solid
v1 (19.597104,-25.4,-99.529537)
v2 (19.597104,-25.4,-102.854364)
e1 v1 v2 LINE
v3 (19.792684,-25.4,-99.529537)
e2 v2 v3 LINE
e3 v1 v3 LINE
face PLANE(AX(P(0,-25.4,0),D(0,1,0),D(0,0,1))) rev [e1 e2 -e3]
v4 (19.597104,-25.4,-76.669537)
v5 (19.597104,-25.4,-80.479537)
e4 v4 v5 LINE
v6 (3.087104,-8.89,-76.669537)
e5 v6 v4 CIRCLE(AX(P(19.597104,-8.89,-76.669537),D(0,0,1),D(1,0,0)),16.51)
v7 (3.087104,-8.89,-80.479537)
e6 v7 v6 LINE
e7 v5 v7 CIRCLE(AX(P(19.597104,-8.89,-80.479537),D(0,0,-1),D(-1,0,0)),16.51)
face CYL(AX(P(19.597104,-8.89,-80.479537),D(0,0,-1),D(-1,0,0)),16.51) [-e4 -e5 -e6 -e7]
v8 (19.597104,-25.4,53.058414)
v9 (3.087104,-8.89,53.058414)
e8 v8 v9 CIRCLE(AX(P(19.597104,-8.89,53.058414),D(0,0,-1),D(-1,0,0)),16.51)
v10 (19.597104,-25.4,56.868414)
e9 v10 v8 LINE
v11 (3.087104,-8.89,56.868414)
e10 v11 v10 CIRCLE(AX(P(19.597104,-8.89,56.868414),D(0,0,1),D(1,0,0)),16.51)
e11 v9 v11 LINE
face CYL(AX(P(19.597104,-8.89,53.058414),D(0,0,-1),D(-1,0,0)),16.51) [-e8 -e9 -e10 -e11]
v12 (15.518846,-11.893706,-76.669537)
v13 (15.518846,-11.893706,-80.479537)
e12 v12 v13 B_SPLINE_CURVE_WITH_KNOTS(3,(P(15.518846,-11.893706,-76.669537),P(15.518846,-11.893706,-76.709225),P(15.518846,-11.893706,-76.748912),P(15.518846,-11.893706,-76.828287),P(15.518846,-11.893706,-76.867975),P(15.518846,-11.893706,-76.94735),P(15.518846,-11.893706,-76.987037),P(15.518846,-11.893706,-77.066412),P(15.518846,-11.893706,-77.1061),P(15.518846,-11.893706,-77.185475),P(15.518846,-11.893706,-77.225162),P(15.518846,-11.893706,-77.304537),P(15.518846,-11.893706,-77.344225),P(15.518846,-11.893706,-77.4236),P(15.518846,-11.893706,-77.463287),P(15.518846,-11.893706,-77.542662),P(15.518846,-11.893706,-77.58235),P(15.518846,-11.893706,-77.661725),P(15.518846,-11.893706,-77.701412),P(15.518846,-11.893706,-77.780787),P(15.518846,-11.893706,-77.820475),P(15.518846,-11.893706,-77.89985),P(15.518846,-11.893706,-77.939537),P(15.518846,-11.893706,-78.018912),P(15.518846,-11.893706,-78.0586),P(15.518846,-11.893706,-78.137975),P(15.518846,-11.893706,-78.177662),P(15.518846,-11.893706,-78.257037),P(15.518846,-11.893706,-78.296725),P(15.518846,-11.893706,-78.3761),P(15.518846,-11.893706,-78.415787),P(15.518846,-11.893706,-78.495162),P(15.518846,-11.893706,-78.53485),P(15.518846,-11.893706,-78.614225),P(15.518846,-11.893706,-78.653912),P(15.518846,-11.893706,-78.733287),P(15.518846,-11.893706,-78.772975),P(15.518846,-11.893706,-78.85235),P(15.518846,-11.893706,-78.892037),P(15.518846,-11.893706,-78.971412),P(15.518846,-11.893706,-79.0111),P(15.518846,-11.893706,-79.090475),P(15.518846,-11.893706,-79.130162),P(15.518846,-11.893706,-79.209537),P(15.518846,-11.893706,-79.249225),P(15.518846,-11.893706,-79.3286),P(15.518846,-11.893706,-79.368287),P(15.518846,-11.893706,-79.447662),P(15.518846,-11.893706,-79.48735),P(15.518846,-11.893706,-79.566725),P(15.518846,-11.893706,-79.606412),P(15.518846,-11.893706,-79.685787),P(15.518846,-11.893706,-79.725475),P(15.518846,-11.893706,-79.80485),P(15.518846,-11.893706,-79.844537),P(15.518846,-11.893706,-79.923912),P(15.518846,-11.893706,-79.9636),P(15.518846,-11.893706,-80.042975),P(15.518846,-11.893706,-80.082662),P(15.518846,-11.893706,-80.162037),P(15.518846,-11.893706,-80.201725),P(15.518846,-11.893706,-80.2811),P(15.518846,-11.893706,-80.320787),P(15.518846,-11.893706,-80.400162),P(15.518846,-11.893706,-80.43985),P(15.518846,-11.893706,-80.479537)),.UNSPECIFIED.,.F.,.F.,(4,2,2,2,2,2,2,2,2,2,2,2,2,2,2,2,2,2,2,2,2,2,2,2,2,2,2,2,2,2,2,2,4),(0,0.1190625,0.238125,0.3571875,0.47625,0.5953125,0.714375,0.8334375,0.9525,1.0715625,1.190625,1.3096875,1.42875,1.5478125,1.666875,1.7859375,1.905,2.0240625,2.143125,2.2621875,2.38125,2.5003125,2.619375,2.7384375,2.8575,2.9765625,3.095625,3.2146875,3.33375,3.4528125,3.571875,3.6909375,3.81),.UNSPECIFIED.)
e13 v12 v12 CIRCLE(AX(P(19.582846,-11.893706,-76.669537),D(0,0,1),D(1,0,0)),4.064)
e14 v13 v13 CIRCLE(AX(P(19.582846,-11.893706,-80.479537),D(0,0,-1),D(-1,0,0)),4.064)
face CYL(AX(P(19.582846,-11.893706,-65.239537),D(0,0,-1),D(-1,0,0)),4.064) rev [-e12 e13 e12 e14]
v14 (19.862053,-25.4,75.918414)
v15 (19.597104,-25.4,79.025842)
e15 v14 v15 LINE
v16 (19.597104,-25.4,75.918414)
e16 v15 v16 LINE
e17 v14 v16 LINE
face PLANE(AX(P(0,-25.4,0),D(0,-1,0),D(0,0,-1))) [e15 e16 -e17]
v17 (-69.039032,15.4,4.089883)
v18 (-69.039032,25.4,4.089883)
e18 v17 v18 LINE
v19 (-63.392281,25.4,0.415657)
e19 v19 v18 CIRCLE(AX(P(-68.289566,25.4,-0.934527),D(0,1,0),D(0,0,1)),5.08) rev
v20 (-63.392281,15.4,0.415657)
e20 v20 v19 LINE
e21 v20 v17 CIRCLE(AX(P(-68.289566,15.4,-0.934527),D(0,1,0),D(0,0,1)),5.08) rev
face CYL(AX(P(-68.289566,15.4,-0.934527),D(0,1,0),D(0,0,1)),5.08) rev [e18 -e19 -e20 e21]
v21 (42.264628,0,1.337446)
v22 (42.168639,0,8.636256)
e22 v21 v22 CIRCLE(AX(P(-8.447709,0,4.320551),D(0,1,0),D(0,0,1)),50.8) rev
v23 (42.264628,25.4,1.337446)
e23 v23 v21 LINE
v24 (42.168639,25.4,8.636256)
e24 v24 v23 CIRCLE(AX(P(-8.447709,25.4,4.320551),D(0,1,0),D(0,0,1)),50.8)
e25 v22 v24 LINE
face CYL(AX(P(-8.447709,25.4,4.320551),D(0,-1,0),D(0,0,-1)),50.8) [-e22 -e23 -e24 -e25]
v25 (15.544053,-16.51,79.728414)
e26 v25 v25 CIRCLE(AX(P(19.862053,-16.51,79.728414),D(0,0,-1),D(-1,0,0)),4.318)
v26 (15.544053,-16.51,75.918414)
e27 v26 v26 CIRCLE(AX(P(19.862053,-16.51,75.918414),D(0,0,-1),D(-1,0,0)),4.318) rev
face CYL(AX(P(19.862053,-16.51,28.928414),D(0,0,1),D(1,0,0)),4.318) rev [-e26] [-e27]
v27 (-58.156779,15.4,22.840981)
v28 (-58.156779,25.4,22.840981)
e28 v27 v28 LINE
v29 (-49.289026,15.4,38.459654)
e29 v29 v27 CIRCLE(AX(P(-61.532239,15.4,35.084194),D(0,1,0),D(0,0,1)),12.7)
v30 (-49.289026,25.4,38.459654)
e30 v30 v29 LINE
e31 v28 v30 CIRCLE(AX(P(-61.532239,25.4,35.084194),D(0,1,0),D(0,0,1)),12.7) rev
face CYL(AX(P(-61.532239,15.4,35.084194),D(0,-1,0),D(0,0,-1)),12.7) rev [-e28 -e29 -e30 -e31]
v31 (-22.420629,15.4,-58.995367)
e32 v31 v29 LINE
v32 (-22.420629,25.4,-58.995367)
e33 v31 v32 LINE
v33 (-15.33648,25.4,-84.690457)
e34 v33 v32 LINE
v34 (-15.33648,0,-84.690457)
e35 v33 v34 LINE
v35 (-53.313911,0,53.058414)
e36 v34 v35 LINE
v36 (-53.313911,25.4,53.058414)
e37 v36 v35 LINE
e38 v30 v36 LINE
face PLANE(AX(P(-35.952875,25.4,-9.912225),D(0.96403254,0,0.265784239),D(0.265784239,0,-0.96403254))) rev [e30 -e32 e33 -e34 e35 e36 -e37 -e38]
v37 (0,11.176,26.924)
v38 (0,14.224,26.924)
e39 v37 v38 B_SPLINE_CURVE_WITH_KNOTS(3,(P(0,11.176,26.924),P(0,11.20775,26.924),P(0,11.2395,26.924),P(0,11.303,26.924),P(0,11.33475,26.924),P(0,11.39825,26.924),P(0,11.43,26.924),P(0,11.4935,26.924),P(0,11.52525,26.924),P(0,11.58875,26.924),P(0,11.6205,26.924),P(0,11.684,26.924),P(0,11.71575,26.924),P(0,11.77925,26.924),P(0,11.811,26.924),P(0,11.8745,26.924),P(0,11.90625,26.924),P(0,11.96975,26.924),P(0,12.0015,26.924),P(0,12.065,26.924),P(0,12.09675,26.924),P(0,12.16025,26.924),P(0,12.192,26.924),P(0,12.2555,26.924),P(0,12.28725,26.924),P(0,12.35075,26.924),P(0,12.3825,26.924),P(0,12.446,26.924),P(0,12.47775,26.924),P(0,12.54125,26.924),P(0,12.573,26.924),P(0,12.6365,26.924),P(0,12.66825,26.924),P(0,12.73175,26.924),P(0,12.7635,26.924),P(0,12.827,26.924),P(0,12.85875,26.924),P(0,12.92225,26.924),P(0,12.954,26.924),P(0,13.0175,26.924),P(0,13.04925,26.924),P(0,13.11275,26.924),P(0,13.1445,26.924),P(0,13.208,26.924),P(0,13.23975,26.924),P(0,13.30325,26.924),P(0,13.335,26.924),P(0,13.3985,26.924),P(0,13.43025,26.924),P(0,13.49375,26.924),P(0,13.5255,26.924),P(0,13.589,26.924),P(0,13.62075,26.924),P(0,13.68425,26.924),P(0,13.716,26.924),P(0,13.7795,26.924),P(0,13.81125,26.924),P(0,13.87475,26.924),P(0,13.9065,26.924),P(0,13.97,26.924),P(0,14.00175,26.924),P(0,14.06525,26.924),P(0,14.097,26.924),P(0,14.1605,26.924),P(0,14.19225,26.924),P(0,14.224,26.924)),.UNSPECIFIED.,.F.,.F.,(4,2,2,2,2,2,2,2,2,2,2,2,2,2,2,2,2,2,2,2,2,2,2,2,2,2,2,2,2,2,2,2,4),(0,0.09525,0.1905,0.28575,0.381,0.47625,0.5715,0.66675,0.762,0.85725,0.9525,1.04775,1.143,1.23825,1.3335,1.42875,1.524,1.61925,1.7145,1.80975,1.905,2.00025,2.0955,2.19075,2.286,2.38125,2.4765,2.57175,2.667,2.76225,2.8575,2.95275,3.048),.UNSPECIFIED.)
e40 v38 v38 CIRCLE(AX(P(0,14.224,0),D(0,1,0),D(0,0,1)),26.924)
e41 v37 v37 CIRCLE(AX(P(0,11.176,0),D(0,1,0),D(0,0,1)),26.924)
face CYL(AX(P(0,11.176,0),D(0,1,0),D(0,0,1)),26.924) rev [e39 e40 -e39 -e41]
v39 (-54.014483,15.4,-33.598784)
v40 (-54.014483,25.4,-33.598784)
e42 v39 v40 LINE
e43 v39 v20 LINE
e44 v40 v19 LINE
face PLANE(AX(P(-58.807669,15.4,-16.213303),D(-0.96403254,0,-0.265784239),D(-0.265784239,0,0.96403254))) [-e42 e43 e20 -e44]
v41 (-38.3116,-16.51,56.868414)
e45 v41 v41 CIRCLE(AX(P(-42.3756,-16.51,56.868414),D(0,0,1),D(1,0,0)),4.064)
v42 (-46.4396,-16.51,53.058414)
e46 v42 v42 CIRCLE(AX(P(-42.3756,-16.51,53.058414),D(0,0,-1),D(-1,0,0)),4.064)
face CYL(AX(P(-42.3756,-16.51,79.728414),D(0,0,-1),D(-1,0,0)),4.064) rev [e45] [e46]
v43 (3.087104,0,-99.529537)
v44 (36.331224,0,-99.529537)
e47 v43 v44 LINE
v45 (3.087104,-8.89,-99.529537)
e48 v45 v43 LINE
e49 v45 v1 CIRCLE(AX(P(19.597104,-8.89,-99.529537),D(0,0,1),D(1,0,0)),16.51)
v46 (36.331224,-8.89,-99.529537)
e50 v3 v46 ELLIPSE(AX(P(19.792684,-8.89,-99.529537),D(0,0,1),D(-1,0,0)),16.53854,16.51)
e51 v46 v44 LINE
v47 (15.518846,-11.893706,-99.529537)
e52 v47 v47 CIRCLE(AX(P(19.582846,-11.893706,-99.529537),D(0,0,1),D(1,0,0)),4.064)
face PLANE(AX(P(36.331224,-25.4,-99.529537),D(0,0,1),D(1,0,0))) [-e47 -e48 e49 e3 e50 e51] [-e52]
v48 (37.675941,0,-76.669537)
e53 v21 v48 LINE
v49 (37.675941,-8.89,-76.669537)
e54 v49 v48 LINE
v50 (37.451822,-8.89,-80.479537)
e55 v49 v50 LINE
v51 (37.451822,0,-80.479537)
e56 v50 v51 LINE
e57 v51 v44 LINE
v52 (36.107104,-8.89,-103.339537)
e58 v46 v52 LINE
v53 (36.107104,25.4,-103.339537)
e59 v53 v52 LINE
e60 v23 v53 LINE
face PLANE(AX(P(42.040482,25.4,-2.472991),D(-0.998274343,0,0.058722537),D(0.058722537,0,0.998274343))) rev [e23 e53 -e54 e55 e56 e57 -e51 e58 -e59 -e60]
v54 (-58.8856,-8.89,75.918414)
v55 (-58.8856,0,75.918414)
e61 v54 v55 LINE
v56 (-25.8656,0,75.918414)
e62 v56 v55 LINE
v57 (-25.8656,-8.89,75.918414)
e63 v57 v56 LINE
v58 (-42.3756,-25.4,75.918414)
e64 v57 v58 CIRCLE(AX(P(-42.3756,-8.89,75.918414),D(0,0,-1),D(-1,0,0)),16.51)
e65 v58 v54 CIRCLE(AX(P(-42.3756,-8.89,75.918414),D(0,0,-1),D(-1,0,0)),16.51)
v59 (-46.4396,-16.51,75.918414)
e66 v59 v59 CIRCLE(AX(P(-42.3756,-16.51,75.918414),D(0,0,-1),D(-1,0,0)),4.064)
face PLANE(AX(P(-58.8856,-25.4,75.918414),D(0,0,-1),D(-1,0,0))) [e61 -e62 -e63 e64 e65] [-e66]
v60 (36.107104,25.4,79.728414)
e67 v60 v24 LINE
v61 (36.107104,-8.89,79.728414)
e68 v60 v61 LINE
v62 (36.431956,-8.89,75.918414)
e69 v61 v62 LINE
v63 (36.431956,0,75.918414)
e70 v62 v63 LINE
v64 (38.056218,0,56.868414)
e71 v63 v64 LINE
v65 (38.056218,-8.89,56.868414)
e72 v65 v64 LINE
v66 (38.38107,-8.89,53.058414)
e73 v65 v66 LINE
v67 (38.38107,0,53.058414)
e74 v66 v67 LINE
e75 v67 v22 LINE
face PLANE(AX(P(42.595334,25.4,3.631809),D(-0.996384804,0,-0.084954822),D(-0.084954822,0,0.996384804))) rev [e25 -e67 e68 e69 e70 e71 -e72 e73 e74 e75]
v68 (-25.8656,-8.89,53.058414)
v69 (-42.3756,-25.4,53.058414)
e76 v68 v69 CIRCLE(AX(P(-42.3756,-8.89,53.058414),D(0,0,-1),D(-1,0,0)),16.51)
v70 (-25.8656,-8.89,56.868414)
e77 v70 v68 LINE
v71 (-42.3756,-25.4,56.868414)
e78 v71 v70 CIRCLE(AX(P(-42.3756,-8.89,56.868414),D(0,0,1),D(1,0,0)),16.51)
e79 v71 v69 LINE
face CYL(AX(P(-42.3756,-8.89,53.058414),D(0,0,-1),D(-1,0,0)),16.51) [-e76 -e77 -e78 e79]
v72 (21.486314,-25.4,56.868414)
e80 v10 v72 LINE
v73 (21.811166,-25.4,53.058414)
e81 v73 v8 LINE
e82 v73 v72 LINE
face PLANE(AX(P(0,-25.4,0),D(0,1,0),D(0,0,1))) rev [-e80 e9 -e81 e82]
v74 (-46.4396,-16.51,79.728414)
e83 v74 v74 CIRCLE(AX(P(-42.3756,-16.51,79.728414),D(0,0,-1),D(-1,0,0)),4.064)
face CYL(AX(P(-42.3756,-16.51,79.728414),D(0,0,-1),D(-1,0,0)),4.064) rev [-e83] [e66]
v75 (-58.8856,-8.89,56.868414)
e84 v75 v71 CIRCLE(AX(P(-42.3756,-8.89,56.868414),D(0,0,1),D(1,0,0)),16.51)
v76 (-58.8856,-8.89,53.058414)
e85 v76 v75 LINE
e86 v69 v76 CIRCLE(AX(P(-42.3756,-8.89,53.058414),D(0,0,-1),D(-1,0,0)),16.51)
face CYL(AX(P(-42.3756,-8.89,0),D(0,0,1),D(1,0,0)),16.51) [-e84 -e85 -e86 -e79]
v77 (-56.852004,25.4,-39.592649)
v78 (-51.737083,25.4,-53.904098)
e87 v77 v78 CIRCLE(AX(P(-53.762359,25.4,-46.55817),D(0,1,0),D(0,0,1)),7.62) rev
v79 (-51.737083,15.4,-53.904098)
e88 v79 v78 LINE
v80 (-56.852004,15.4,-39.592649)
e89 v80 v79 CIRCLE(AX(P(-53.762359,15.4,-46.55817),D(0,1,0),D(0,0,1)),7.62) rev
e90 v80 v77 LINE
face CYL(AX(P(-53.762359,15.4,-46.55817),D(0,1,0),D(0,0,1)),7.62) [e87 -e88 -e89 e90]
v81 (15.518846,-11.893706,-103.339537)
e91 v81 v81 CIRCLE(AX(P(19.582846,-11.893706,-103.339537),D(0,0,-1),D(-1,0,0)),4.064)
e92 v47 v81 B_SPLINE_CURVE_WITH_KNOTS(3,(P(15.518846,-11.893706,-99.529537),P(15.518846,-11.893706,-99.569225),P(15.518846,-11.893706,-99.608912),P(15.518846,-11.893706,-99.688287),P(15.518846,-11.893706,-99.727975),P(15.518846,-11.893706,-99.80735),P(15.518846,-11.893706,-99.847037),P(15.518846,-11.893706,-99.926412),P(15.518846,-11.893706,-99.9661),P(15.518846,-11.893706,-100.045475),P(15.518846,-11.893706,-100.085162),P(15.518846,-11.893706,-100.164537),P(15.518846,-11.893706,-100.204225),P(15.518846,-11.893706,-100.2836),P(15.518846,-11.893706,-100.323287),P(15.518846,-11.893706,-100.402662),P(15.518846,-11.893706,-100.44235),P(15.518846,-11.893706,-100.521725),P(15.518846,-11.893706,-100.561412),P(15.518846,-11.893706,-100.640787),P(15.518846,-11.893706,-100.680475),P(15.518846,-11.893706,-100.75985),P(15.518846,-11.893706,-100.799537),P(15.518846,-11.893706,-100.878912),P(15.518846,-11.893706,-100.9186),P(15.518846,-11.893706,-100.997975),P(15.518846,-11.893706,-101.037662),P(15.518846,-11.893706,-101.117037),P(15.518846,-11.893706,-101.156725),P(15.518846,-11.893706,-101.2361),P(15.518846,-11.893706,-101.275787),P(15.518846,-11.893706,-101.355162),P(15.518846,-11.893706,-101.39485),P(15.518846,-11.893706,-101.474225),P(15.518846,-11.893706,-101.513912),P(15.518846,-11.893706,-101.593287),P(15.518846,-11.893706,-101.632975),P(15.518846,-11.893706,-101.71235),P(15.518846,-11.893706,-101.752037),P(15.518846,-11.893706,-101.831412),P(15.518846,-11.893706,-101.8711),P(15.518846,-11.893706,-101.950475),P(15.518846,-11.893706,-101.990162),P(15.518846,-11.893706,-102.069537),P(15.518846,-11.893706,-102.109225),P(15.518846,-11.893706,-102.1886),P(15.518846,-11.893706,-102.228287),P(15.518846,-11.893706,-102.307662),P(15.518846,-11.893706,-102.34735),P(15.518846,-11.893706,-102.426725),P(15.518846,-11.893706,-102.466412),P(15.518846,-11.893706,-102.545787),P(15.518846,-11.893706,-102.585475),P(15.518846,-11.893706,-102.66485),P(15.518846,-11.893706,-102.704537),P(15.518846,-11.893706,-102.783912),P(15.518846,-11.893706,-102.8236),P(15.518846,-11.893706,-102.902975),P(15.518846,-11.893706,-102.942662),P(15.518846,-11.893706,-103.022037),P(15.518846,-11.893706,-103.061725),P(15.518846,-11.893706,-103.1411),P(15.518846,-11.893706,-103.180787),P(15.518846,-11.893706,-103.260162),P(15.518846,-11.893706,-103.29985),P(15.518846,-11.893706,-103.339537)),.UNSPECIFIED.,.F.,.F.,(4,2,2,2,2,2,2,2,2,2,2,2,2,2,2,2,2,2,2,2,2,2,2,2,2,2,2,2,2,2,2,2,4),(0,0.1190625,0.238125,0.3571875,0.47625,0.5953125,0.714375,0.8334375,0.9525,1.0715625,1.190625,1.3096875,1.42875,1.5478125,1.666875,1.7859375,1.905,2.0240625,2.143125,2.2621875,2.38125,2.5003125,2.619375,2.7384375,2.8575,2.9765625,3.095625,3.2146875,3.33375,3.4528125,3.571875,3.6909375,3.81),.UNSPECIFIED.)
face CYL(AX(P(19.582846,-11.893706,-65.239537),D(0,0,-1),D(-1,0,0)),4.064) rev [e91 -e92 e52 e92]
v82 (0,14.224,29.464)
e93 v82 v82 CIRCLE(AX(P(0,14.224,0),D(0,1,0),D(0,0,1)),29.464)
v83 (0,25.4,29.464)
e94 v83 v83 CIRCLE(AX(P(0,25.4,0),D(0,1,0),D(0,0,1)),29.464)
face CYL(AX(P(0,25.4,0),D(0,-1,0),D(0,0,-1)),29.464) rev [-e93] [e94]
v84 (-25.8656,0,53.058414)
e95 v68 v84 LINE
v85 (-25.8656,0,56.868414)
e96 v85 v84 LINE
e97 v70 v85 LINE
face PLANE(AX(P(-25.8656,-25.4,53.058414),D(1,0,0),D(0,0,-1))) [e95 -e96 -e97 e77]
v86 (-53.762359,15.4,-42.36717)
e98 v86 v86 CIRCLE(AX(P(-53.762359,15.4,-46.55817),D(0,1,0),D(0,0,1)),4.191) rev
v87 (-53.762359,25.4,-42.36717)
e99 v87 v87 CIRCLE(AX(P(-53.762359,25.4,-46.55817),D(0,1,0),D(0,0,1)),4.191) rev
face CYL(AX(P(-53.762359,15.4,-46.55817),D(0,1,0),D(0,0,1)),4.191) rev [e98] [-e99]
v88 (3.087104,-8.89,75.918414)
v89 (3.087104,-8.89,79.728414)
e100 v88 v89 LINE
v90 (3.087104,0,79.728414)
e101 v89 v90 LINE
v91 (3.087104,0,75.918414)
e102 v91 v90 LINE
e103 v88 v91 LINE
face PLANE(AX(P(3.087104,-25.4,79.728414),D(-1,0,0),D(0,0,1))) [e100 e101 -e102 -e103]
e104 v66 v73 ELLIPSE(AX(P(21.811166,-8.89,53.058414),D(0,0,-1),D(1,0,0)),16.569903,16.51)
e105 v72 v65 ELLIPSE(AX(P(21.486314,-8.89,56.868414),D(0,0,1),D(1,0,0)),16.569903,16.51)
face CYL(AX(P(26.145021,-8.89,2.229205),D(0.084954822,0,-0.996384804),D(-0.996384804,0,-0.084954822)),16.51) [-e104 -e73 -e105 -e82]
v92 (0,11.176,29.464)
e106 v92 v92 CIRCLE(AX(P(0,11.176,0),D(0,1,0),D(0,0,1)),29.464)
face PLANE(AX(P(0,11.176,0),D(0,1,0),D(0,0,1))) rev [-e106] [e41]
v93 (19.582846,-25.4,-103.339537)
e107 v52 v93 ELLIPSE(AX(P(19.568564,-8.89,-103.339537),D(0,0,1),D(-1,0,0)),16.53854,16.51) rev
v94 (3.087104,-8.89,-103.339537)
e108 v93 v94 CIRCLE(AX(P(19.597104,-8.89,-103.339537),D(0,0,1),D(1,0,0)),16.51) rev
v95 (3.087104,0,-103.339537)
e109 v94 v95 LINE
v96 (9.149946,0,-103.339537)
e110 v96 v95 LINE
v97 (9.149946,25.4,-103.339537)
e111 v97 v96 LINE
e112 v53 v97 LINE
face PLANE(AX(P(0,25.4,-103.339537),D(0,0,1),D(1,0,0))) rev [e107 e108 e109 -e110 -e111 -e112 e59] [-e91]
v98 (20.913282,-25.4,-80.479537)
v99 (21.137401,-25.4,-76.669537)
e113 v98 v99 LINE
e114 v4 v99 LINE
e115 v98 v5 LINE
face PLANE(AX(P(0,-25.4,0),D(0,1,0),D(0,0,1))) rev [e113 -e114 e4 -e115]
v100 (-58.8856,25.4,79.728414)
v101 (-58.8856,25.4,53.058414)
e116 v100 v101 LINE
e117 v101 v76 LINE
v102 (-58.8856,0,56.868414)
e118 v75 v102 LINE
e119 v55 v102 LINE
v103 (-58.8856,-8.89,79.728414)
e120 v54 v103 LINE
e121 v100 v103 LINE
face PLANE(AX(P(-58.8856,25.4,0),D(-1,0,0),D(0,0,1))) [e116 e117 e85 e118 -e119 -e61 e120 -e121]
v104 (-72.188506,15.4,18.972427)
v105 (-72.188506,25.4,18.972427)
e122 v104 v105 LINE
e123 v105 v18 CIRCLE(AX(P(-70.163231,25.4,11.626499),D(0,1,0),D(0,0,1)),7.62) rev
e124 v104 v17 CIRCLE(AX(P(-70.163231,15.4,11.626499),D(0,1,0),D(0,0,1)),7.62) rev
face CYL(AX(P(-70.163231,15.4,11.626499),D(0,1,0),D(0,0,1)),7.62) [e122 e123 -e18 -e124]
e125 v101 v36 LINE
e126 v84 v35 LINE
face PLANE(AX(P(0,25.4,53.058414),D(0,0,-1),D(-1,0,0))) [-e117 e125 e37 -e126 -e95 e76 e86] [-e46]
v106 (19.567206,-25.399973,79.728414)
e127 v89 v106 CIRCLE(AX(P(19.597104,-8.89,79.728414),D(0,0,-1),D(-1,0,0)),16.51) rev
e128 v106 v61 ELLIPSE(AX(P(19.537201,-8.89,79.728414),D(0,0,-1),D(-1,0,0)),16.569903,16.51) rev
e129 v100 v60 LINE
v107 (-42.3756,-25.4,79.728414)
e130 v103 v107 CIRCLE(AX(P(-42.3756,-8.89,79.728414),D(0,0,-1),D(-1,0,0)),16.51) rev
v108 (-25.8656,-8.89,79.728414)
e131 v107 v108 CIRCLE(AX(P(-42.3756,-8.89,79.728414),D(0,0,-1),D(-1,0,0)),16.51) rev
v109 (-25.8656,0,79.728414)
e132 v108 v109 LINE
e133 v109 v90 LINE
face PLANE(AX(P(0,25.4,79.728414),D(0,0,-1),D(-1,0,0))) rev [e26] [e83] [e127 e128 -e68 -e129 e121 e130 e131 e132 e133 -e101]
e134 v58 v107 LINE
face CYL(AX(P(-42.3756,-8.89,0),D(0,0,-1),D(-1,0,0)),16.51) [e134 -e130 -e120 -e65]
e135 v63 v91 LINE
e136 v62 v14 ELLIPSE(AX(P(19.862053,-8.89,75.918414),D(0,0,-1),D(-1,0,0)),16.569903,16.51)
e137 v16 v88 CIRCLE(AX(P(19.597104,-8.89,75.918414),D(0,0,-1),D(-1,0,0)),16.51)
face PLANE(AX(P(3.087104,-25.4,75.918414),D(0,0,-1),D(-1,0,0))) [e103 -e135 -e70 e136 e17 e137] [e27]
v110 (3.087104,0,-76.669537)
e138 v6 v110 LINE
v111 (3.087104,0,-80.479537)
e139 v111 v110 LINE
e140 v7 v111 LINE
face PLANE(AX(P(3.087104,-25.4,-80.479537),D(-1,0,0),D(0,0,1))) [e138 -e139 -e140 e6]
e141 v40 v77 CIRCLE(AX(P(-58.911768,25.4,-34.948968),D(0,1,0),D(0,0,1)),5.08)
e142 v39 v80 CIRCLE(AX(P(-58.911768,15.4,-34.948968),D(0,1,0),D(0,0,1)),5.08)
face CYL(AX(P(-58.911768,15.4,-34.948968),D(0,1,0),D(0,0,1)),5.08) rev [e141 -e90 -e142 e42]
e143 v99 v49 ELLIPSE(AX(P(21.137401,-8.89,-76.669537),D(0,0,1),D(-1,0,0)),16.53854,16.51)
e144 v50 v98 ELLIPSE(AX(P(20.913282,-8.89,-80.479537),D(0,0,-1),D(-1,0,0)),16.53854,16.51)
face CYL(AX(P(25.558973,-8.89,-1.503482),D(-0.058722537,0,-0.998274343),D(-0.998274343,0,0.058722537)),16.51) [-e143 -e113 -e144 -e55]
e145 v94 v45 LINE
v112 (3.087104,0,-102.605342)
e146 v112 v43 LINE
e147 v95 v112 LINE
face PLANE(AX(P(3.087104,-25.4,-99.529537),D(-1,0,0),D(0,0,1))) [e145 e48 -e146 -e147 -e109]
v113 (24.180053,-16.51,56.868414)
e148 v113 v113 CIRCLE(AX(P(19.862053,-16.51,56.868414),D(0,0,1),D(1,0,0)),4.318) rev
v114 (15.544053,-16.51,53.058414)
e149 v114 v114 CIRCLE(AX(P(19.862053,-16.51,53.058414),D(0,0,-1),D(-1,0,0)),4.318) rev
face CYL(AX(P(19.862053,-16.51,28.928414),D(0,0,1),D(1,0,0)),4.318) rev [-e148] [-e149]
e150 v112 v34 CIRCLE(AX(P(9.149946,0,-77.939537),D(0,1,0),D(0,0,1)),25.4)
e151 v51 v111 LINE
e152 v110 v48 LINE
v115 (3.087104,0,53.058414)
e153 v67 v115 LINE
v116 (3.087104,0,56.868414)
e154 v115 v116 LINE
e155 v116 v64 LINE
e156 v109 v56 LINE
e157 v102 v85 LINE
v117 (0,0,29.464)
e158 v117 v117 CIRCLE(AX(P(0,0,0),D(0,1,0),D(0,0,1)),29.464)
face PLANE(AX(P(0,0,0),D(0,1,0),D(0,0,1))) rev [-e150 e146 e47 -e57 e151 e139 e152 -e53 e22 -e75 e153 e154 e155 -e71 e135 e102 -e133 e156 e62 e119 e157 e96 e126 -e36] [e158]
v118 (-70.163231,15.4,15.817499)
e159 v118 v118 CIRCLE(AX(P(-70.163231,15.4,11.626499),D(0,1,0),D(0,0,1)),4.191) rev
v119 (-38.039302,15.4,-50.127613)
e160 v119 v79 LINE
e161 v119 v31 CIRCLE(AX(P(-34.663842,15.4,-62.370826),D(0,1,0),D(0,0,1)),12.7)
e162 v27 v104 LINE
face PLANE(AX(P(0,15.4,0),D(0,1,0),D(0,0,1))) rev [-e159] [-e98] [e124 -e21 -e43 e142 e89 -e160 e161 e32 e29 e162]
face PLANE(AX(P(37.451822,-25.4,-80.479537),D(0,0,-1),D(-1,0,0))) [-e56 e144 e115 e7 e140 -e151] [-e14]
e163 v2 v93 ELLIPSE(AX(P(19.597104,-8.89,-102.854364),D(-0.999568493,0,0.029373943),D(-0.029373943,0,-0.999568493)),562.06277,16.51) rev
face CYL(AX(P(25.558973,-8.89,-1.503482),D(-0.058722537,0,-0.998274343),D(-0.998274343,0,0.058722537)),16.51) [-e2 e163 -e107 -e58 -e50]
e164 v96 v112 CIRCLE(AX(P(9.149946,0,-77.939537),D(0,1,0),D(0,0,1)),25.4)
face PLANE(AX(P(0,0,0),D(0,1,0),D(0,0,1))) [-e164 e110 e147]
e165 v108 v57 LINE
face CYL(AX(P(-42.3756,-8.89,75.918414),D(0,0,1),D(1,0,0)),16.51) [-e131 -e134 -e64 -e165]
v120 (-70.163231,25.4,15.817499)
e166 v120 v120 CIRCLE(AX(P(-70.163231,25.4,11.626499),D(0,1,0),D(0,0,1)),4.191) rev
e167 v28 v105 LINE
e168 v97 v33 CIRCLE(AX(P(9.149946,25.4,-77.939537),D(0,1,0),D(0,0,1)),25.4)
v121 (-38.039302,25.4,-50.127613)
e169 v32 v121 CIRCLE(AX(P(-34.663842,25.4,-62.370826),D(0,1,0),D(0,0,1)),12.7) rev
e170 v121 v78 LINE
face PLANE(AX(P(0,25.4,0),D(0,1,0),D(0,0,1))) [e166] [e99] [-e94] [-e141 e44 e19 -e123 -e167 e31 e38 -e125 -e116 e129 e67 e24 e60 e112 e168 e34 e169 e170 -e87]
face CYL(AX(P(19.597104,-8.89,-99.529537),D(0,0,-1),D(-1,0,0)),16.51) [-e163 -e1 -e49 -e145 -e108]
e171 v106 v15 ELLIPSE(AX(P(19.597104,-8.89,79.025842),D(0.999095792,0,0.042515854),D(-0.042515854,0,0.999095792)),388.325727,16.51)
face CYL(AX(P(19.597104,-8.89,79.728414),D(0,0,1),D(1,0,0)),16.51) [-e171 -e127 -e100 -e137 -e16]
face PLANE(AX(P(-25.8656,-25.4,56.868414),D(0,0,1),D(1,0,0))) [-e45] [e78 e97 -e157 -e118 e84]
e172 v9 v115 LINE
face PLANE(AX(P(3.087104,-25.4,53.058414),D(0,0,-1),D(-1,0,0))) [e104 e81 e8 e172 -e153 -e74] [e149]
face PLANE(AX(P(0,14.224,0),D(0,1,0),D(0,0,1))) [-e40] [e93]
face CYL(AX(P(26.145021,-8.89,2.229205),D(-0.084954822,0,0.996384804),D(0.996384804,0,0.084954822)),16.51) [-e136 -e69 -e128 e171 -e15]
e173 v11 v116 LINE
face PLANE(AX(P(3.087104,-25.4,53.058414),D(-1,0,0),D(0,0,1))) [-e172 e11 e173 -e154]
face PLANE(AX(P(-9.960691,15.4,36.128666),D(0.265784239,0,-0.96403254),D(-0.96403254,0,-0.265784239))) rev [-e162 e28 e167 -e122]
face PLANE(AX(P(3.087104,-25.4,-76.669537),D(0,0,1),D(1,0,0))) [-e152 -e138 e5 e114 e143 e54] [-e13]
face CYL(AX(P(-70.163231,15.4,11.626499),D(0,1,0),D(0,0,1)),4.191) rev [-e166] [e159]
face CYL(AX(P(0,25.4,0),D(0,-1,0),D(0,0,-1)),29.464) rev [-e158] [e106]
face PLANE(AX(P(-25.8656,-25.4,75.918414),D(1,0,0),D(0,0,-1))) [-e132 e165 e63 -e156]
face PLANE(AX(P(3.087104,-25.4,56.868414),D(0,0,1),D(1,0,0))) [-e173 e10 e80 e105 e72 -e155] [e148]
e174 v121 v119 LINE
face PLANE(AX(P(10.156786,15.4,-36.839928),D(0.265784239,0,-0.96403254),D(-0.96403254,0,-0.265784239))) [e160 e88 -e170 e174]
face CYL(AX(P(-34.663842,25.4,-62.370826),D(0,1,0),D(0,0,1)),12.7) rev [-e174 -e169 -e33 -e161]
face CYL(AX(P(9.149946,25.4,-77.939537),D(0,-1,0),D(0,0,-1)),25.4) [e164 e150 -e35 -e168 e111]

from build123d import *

# Parameters (mm, degrees)
SKETCH1_R                      = 29.464
BASE_DEPTH                     = 25.4
SKETCH2_W                      = 33.02
SKETCH2_H                      = 3.81
A_ARMS_DEPTH                   = 25.4
FILLET_A_ARM_TAB_F_R           = 16.51
FILLET2_R                      = 50.8
BOSS_EXTRUDE3_DEPTH            = 10
FILLET3_R                      = 12.7
SKETCH6_R                      = 4.064
TAB_HOLES_1_DEPTH              = 38.1
SKETCH7_R                      = 4.064
TAB_HOLES_2_DEPTH              = 177.509801452
MID_FEATURE_BEARING_DEPTH      = 1.524
MID_FEATURE_BEARING_DEPTH_BACK = 1.524
SKETCH8_R                      = 29.464
SKETCH8_R_2                    = 26.924
SKETCH11_R                     = 4.318
TAB_HOLES_3_DEPTH              = 50.8


with BuildPart() as part:
    # Sketch1 → Base (new body)
    with BuildSketch(Plane(origin=(0, 0, 0), x_dir=(1, 0, 0), z_dir=(0, 1, 0))):
        with BuildLine():
            Line((-58.88559997, -79.728413598), (36.107103946, -79.728413598))
            Line((36.107103946, -79.728413598), (42.479503863, -4.99030836))
            Line((42.479503863, -4.99030836), (36.107103946, 103.339537331))
            Line((36.107103946, 103.339537331), (9.149946216, 103.339537331))
            ThreePointArc((9.149946216, 103.339537331), (-6.239768533, 98.146384684), (-15.336480298, 84.690457011))
            Line((-15.336480298, 84.690457011), (-53.313910816, -53.058413598))
            Line((-53.313910816, -53.058413598), (-58.88559997, -53.058413598))
            Line((-58.88559997, -53.058413598), (-58.88559997, -79.728413598))
        make_face()
        with Locations(Location((0, 0, 0), (0, 0, 270))):
            Circle(SKETCH1_R, mode=Mode.SUBTRACT)
    extrude(amount=BASE_DEPTH)

    # Sketch2 → A-Arms (add)
    with BuildSketch(Plane(origin=(0, 0, 0), x_dir=(1, 0, 0), z_dir=(0, 1, 0))):
        Polygon((36.107103946, 103.339537331), (36.331223565, 99.529537331), (3.087103946, 99.529537331), (3.087103946, 103.339537331), align=None)
        Polygon((3.087103946, -75.918413598), (36.431956223, -75.918413598), (36.107103946, -79.728413598), (3.087103946, -79.728413598), align=None)
        Polygon((3.087103946, 80.479537331), (3.087103946, 76.669537331), (37.675941275, 76.669537331), (37.451821657, 80.479537331), align=None)
        Polygon((3.087103946, -53.058413598), (38.381069887, -53.058413598), (38.056217609, -56.868413598), (3.087103946, -56.868413598), align=None)
        with Locations((-42.37559997, -54.963413598)):
            Rectangle(SKETCH2_W, SKETCH2_H)
        with Locations((-42.37559997, -77.823413598)):
            Rectangle(SKETCH2_W, SKETCH2_H)
    extrude(amount=-A_ARMS_DEPTH)

    # Fillet a-arm tab f
    # the kernel refuses this fillet: 16.51 mm, written as the material it takes off along each edge
    with BuildSketch(Plane(origin=(39.93846651, -25.4, 34.792630802), x_dir=(-0.9963848042708363, 0, -0.08495482221844149), z_dir=(-0.08495482221844149, 0, 0.9963848042708364)), Plane(origin=(41.887580174, -25.4, 11.932630802), x_dir=(-0.9963848042708365, 0, -0.08495482221843932), z_dir=(-0.08495482221843934, 0, 0.9963848042708366))) as fillet_a_arm_tab_f_piece_1:
        with BuildLine():
            CenterArc((FILLET_A_ARM_TAB_F_R, -FILLET_A_ARM_TAB_F_R), FILLET_A_ARM_TAB_F_R, 90, 90)
            Line((0, -FILLET_A_ARM_TAB_F_R), (0, 0))
            Line((0, 0), (FILLET_A_ARM_TAB_F_R, 0))
        make_face()
    extrude(amount=86.373823872, mode=Mode.SUBTRACT)
    with BuildSketch(Plane(origin=(3.087103946, -25.4, 121.003413598), x_dir=(0, 1, 0), z_dir=(0, 0, -1)), Plane(origin=(3.087103946, -25.4, -121.754537331), x_dir=(1, 0, 0), z_dir=(0, 0, 1)), Plane(origin=(-25.86559997, -25.4, 98.143413598), x_dir=(-1, 0, 0), z_dir=(0, 0, -1)), Plane(origin=(-58.88559997, -25.4, 11.783413598), x_dir=(1, 0, 0), z_dir=(0, 0, 1))) as fillet_a_arm_tab_f_piece_2:
        with BuildLine():
            CenterArc((FILLET_A_ARM_TAB_F_R, FILLET_A_ARM_TAB_F_R), FILLET_A_ARM_TAB_F_R, 180, 90)
            Line((0, FILLET_A_ARM_TAB_F_R), (0, 0))
            Line((0, 0), (FILLET_A_ARM_TAB_F_R, 0))
        make_face()
    extrude(amount=86.36, mode=Mode.SUBTRACT)
    with BuildSketch(Plane(origin=(3.087103946, -25.4, 98.143413598), x_dir=(1, 0, 0), z_dir=(0, 0, -1)), Plane(origin=(3.087103946, -25.4, -58.254537331), x_dir=(1, 0, 0), z_dir=(0, 0, -1)), Plane(origin=(-58.88559997, -25.4, 121.003413598), x_dir=(1, 0, 0), z_dir=(0, 0, -1)), Plane(origin=(-25.86559997, -25.4, 34.643413598), x_dir=(-1, 0, 0), z_dir=(0, 0, 1))) as fillet_a_arm_tab_f_piece_3:
        with BuildLine():
            CenterArc((FILLET_A_ARM_TAB_F_R, -FILLET_A_ARM_TAB_F_R), FILLET_A_ARM_TAB_F_R, 90, 90)
            Line((0, -FILLET_A_ARM_TAB_F_R), (0, 0))
            Line((0, 0), (FILLET_A_ARM_TAB_F_R, 0))
        make_face()
    extrude(amount=86.36, mode=Mode.SUBTRACT)
    with BuildSketch(Plane(origin=(40.099713977, -25.4, -35.465763828), x_dir=(-0.9982743428955775, 0, 0.05872253669931843), z_dir=(-0.05872253669931843, 0, -0.9982743428955776)), Plane(origin=(33.683331244, -25.4, -144.543310834), x_dir=(0, 1, 0), z_dir=(0.05872253669931843, 0, 0.9982743428955776))) as fillet_a_arm_tab_f_piece_4:
        with BuildLine():
            CenterArc((FILLET_A_ARM_TAB_F_R, FILLET_A_ARM_TAB_F_R), FILLET_A_ARM_TAB_F_R, 180, 90)
            Line((0, FILLET_A_ARM_TAB_F_R), (0, 0))
            Line((0, 0), (FILLET_A_ARM_TAB_F_R, 0))
        make_face()
    extrude(amount=86.366586119, mode=Mode.SUBTRACT)

    # Fillet2
    fillet2_edges = [part.edges().sort_by_distance(p)[0] for p in [
        (42.479503863, 12.7, 4.99030836),
    ]]
    fillet(fillet2_edges, radius=FILLET2_R)

    # Sketch3 → Boss-Extrude3 (add)
    with BuildSketch(Plane(origin=(0, 25.4, 0), x_dir=(-1, 0, 0), z_dir=(0, -1, 0))):
        with BuildLine():
            Line((47.666796836, 52.78191811), (25.796089041, 46.75215335))
            Line((25.796089041, 46.75215335), (45.913565896, -26.216440853))
            Line((45.913565896, -26.216440853), (68.231322711, -20.063424462))
            ThreePointArc((68.231322711, -20.063424462), (68.827916005, -17.910119441), (69.356571433, -15.739135906))
            ThreePointArc((69.356571433, -15.739135906), (66.028611601, -10.941366051), (70.726242467, -7.473488245))
            ThreePointArc((70.726242467, -7.473488245), (70.885962372, -5.764957818), (71.004415449, -4.053071275))
            ThreePointArc((71.004415449, -4.053071275), (70.020531637, -4.0078353), (69.039031874, -4.089883254))
            ThreePointArc((69.039031874, -4.089883254), (65.518990894, -3.323443269), (63.392280792, -0.415656673))
            Line((63.392280792, -0.415656673), (54.014483076, 33.598783658))
            ThreePointArc((54.014483076, 33.598783658), (54.320283062, 37.122596493), (56.852004495, 39.592648541))
            ThreePointArc((56.852004495, 39.592648541), (57.672230058, 40.01773376), (58.434985849, 40.538954462))
            ThreePointArc((58.434985849, 40.538954462), (57.439925969, 41.936968234), (56.41142698, 43.310568065))
            ThreePointArc((56.41142698, 43.310568065), (50.594219677, 43.814563519), (50.926596454, 49.644095052))
            ThreePointArc((50.926596454, 49.644095052), (49.321656334, 51.238936528), (47.666796836, 52.78191811))
        make_face()
        with BuildLine():
            Line((51.737082765, 53.904097917), (47.666796836, 52.78191811))
            ThreePointArc((47.666796836, 52.78191811), (49.321656334, 51.238936528), (50.926596454, 49.644095052))
            ThreePointArc((50.926596454, 49.644095052), (55.447559185, 50.395432037), (57.95335867, 46.558169963))
            ThreePointArc((57.95335867, 46.558169963), (57.548301504, 44.760638918), (56.41142698, 43.310568065))
            ThreePointArc((56.41142698, 43.310568065), (57.439925969, 41.936968234), (58.434985849, 40.538954462))
            ThreePointArc((58.434985849, 40.538954462), (60.574765152, 49.972187818), (51.737082765, 53.904097917))
        make_face()
        with BuildLine():
            ThreePointArc((69.356571433, -15.739135906), (68.827916005, -17.910119441), (68.231322711, -20.063424462))
            Line((68.231322711, -20.063424462), (72.188506448, -18.972426984))
            ThreePointArc((72.188506448, -18.972426984), (77.759344227, -11.023625151), (71.004415449, -4.053071275))
            ThreePointArc((71.004415449, -4.053071275), (70.885962372, -5.764957818), (70.726242467, -7.473488245))
            ThreePointArc((70.726242467, -7.473488245), (73.319499224, -8.869245139), (74.354230544, -11.62649903))
            ThreePointArc((74.354230544, -11.62649903), (72.826290125, -14.862637881), (69.356571433, -15.739135906))
        make_face()
    extrude(amount=BOSS_EXTRUDE3_DEPTH)

    # Fillet3
    fillet3_edges = [part.edges().sort_by_distance(p)[0] for p in [
        (-25.796089041, 20.4, -46.75215335),
        (-45.913565896, 20.4, 26.216440853),
    ]]
    fillet(fillet3_edges, radius=FILLET3_R)

    # Sketch6 → Tab Holes 1 (cut)
    with BuildSketch(Plane(origin=(0, 0, -103.339537331), x_dir=(-1, 0, 0), z_dir=(0, 0, -1))):
        with Locations((-19.582846345, -11.893705932)):
            Circle(SKETCH6_R)
    extrude(amount=-TAB_HOLES_1_DEPTH, mode=Mode.SUBTRACT)

    # Sketch7 → Tab Holes 2 (cut, through all)
    with BuildSketch(Plane(origin=(0, 0, 53.058413598), x_dir=(-1, 0, 0), z_dir=(0, 0, -1))):
        with Locations((42.37559997, -16.51)):
            Circle(SKETCH7_R)
    extrude(amount=-TAB_HOLES_2_DEPTH, mode=Mode.SUBTRACT)

    # Sketch8 → mid-feature bearing (add, two sides: drawn at the far end of the back side and taken through both)
    with BuildSketch(Plane(origin=(0, 12.7, 0), x_dir=(1, 0, 0), z_dir=(0, 1, 0)).offset(-MID_FEATURE_BEARING_DEPTH_BACK)):
        with Locations(Location((0, 0, 0), (0, 0, 270))):
            Circle(SKETCH8_R)
        with Locations(Location((0, 0, 0), (0, 0, 270))):
            Circle(SKETCH8_R_2, mode=Mode.SUBTRACT)
    extrude(amount=MID_FEATURE_BEARING_DEPTH + MID_FEATURE_BEARING_DEPTH_BACK)

    # Sketch11 → Tab Holes 3 (cut)
    with BuildSketch(Plane(origin=(0, 0, 79.728413598), x_dir=(-1, 0, 0), z_dir=(0, 0, -1))):
        with Locations(Location((-19.862052779, -16.51, 0), (0, 0, 180))):
            Circle(SKETCH11_R)
    extrude(amount=TAB_HOLES_3_DEPTH, mode=Mode.SUBTRACT)


solid = part.part
